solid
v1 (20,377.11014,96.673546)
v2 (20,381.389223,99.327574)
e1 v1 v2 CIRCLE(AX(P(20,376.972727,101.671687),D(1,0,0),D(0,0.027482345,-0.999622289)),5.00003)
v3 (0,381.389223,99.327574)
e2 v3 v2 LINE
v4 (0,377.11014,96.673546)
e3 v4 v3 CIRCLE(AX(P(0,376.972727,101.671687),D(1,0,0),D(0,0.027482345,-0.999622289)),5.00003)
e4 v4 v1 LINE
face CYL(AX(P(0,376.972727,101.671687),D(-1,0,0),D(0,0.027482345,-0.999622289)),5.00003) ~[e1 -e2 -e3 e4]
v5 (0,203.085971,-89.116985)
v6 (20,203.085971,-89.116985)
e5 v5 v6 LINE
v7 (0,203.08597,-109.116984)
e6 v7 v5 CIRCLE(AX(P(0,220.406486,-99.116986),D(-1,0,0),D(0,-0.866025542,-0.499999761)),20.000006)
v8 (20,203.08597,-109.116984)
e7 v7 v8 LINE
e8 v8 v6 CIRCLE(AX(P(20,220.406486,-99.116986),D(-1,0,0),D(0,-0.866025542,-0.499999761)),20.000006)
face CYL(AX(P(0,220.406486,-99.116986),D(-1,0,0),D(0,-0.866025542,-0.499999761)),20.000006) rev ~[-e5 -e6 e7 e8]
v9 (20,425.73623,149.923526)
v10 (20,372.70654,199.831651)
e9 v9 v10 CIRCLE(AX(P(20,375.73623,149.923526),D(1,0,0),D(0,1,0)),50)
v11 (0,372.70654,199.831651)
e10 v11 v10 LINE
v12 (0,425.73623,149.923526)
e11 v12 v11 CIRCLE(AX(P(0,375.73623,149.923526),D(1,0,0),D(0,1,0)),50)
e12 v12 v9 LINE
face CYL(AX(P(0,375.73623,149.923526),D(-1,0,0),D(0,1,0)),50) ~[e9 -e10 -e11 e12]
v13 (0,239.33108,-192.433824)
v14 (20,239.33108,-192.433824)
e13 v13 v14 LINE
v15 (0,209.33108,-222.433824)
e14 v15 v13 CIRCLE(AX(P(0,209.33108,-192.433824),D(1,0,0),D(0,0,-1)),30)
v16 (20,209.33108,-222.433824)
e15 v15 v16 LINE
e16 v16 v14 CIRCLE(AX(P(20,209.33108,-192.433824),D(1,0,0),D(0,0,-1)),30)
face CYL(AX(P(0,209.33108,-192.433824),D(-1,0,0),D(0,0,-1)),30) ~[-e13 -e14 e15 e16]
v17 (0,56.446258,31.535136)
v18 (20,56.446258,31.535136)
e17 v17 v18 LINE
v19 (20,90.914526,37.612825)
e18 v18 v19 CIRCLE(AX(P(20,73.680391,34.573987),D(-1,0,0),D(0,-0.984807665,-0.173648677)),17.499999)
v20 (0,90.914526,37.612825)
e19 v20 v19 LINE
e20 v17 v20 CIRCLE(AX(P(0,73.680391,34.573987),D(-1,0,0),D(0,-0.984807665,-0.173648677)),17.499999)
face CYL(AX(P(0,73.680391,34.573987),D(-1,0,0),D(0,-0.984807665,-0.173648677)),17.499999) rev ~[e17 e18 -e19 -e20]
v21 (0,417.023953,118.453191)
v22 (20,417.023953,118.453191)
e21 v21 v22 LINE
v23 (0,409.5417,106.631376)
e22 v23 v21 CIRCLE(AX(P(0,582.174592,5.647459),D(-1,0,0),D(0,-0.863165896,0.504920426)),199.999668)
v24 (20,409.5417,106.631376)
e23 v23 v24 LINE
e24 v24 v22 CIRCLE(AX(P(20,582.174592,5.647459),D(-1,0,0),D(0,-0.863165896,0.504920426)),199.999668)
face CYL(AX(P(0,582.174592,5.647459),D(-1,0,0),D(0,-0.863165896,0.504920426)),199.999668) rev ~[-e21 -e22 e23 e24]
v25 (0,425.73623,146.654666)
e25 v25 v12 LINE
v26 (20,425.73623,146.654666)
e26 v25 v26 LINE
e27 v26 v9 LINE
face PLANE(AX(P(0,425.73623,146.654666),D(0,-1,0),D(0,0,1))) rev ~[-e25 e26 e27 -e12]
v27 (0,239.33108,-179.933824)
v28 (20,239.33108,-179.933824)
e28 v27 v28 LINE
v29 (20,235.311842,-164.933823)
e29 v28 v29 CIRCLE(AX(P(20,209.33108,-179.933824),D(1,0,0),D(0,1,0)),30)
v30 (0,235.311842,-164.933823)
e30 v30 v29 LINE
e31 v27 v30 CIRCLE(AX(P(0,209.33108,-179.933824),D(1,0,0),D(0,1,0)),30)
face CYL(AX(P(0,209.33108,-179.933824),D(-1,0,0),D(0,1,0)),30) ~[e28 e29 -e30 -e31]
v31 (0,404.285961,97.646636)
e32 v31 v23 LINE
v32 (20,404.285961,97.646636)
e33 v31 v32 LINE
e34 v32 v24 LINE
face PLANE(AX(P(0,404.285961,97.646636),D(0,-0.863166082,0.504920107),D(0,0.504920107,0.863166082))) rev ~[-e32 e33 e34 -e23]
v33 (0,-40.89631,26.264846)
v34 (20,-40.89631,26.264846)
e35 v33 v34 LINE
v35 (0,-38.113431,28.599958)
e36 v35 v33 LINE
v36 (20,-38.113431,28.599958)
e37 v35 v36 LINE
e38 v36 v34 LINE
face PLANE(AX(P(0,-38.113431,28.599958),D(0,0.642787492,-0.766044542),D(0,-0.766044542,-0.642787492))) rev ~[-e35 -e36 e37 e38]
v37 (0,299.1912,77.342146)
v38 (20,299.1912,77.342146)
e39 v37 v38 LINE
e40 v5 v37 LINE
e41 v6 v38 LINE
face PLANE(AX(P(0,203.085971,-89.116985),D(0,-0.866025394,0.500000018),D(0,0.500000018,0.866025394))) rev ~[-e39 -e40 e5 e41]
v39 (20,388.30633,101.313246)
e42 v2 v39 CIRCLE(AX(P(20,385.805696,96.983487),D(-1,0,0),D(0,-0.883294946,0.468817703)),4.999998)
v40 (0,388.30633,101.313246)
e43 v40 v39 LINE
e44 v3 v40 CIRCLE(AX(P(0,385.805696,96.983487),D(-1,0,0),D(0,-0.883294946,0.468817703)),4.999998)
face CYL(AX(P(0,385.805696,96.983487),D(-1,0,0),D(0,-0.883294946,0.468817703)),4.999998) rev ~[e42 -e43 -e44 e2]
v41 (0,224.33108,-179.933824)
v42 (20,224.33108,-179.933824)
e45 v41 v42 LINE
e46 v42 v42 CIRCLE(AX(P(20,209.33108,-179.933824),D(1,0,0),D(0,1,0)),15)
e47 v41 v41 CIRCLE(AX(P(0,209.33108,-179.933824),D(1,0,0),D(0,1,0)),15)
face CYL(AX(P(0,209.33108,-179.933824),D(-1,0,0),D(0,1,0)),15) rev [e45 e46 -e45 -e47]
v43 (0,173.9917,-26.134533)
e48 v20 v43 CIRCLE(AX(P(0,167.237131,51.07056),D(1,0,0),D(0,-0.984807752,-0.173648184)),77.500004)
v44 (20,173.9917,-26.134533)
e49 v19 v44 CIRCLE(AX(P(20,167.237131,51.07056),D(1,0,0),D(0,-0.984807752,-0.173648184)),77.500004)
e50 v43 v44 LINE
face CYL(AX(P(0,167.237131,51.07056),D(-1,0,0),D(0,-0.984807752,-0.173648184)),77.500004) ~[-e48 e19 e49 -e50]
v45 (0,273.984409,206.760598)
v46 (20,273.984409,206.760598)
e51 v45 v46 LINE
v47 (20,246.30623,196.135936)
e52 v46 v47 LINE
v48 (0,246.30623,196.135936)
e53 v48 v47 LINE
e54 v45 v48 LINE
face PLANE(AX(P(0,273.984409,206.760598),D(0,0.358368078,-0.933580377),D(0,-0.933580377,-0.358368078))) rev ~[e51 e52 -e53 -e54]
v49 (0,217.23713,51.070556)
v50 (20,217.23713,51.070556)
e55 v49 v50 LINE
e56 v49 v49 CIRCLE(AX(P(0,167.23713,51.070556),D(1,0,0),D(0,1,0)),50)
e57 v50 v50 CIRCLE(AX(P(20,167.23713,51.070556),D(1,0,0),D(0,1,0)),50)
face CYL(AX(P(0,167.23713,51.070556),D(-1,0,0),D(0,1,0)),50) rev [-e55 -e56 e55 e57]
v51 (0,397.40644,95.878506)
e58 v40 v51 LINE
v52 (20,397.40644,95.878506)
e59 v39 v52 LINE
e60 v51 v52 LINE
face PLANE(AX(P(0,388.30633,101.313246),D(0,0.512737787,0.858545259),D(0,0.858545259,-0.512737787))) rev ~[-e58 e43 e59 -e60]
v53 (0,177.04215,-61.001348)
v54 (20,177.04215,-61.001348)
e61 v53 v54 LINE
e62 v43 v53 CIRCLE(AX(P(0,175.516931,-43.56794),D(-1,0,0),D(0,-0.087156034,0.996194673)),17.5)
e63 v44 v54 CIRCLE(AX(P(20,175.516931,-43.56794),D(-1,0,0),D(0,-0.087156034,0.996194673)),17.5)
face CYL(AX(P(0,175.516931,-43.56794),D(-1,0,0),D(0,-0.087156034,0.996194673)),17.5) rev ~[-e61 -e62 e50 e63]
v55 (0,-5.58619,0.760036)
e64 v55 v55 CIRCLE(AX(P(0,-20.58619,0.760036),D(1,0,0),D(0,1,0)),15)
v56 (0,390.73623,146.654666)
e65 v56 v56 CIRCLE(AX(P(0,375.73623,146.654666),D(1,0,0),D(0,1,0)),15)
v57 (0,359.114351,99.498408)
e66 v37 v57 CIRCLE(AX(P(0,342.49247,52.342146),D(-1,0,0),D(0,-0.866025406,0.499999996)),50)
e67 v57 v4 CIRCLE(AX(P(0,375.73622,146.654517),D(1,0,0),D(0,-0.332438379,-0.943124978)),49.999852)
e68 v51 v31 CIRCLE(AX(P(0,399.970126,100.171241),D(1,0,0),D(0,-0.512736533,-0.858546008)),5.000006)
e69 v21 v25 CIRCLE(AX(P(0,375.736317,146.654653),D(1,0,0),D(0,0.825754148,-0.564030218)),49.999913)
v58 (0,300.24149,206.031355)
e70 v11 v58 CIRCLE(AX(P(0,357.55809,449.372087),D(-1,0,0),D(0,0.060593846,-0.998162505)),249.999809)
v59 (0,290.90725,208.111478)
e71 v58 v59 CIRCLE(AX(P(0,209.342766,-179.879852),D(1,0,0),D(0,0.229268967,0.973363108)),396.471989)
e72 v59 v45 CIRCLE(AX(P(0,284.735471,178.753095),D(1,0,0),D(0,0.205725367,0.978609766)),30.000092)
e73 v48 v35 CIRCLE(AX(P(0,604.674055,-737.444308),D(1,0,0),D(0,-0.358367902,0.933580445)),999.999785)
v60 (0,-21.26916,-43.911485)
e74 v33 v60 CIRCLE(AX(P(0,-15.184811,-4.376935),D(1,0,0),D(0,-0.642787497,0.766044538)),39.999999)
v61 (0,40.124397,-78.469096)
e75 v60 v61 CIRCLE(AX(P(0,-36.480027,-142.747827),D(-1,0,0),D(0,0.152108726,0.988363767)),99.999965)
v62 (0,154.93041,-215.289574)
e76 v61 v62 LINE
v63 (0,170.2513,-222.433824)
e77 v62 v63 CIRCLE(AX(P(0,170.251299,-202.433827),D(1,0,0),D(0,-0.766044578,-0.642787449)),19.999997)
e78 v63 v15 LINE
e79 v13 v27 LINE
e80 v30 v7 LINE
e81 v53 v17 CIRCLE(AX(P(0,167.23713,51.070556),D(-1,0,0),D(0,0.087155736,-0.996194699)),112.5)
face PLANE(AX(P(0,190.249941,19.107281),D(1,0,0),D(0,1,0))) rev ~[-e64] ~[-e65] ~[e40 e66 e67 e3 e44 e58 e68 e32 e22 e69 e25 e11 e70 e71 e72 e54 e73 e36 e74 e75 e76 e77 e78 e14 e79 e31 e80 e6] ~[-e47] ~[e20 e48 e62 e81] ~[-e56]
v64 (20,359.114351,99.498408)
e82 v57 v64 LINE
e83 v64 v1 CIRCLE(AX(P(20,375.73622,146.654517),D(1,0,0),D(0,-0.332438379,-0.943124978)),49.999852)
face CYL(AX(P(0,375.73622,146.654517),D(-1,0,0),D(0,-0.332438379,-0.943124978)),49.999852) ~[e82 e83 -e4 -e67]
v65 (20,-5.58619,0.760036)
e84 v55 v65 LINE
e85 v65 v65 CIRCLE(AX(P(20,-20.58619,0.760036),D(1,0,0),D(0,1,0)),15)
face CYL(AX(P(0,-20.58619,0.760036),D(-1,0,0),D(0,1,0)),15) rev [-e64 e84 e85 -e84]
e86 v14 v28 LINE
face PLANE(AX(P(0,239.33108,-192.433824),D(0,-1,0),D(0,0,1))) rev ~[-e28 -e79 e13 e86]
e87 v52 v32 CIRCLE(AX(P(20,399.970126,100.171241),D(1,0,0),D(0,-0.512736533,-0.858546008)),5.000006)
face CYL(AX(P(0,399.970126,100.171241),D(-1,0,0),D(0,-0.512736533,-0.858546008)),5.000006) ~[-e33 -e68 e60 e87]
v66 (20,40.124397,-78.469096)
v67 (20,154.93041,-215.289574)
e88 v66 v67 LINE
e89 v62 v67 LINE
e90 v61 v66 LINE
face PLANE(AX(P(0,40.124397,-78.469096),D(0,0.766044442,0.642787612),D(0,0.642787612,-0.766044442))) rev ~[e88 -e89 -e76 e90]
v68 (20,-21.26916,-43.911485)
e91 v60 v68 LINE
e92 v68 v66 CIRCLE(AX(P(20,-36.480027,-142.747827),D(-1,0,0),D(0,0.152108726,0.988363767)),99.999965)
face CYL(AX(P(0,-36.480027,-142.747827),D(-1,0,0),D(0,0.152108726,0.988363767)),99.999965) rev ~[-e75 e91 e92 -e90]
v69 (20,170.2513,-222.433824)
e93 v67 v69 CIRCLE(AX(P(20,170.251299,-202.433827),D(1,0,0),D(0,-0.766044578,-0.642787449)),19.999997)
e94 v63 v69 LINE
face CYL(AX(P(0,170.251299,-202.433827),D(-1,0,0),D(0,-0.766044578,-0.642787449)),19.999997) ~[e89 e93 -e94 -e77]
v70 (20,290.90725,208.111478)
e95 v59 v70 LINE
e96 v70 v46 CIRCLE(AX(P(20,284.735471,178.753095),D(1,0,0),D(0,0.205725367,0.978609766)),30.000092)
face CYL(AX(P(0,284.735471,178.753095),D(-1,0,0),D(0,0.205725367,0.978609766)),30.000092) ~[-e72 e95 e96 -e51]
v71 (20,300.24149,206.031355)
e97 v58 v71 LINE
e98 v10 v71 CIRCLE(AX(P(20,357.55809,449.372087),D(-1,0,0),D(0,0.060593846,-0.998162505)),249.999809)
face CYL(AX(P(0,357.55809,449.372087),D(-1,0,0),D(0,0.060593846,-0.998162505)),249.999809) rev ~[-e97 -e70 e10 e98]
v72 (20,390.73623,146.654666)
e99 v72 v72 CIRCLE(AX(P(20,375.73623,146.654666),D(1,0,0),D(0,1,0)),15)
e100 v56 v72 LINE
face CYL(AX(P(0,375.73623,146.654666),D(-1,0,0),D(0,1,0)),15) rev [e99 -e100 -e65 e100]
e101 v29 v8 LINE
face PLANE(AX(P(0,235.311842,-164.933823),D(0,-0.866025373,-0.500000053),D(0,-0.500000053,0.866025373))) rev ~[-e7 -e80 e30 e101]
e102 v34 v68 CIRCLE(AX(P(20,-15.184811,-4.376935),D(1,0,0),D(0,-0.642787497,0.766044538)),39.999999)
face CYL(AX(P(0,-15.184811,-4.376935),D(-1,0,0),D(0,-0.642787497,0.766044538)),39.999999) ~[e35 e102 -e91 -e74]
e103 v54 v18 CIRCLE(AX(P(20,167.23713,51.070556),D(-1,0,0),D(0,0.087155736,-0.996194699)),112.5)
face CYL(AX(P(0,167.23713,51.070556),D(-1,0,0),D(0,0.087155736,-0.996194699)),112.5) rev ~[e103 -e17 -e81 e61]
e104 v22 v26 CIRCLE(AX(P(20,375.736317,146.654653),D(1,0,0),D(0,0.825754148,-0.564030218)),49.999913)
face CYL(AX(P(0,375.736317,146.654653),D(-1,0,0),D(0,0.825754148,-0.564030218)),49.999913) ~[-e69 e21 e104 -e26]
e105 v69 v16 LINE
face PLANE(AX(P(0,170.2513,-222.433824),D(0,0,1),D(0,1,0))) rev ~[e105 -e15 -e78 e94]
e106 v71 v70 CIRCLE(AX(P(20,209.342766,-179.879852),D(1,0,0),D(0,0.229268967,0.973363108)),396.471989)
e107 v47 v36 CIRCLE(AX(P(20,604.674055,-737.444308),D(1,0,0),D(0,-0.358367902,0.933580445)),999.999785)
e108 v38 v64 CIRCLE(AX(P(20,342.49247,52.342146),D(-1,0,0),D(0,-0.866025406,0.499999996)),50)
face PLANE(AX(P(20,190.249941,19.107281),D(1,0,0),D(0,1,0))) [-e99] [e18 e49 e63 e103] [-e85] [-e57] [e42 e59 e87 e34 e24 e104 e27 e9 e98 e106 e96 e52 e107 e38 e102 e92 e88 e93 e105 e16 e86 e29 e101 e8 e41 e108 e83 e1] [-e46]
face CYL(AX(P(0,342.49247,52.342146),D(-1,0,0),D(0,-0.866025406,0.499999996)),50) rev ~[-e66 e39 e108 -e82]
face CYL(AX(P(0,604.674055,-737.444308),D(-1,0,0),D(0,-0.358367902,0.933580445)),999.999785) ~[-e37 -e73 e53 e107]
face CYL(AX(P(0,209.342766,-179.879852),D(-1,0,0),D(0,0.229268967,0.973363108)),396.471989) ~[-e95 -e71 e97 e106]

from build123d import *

# Parameters (mm, degrees)
F0_R     = 1.5
F0_R_2   = 5
F1_DEPTH = 2
F2_SCALE = 10


# Not quite as in the source:
# - ends of sketch curves that miss each other by under 0.0002 mm in the source are joined


with BuildPart() as f1:
    # F0 (on Right) → F1 (new body)
    with BuildSketch(Plane.YZ):
        with BuildLine():
            Line((20.303062, 10.815357), (21.213073, 10.271883))
            ThreePointArc((21.213073, 10.271883), (21.5939035848, 10.2168943828), (21.901025054, 10.4486959684))
            Line((21.901025054, 10.4486959684), (22.426599, 11.34717))
            ThreePointArc((22.426599, 11.34717), (22.7903712384, 11.9448053837), (23.1748242578, 12.529351507))
            ThreePointArc((23.1748242578, 12.529351507), (23.8232826043, 13.8736711803), (24.046052, 15.349499))
            Line((24.046052, 15.349499), (24.046052, 15.676385))
            ThreePointArc((24.046052, 15.676385), (22.4727964344, 19.3174593718), (18.7430829675, 20.6671975356))
            ThreePointArc((18.7430829675, 20.6671975356), (15.0971647826, 20.7122553198), (11.4965779735, 21.2871678873))
            ThreePointArc((11.4965779735, 21.2871678873), (11.0304932137, 21.3939885254), (10.5631540495, 21.4951802352))
            ThreePointArc((10.5631540495, 21.4951802352), (9.7072570471, 21.5498382875), (8.8708699259, 21.360092193))
            Line((8.8708699259, 21.360092193), (6.103052, 20.297626))
            ThreePointArc((6.103052, 20.297626), (-8.8139895114, 13.1024999173), (-22.3389141406, 3.5440281676))
            Line((-22.3389141406, 3.5440281676), (-22.617202, 3.310517))
            ThreePointArc((-22.617202, 3.310517), (-23.8982246357, -0.8310495022), (-20.6544870079, -3.7071160511))
            ThreePointArc((-20.6544870079, -3.7071160511), (-17.2704039619, -4.8764379221), (-14.5151312861, -7.1628772401))
            Line((-14.5151312861, -7.1628772401), (-3.03453, -20.844925))
            ThreePointArc((-3.03453, -20.844925), (-2.3476776328, -21.3719655231), (-1.502441, -21.55935))
            Line((-1.502441, -21.55935), (2.405537, -21.55935))
            ThreePointArc((2.405537, -21.55935), (4.5268573436, -20.6806703436), (5.405537, -18.55935))
            Line((5.405537, -18.55935), (5.405537, -17.30935))
            ThreePointArc((5.405537, -17.30935), (5.3033144652, -16.5328928137), (5.0036131585, -15.8093499085))
            Line((5.0036131585, -15.8093499085), (1.781026, -10.227666))
            ThreePointArc((1.781026, -10.227666), (1.513077, -9.227666), (1.7810261443, -8.2276660833))
            Line((1.7810261443, -8.2276660833), (11.391549, 8.418247))
            ThreePointArc((11.391549, 8.418247), (13.9876851036, 10.6079458785), (17.3838640825, 10.633873234))
            ThreePointArc((17.3838640825, 10.633873234), (18.2706804185, 10.4099849641), (19.1834430004, 10.3513869851))
            ThreePointArc((19.1834430004, 10.3513869851), (19.4332447525, 10.4262916315), (19.6113513075, 10.6167898368))
            ThreePointArc((19.6113513075, 10.6167898368), (19.9150373869, 10.862970839), (20.303062, 10.815357))
        make_face()
        with Locations((2.405537, -17.30935)):
            Circle(F0_R, mode=Mode.SUBTRACT)
        with Locations((-20.58619, 0.760036)):
            Circle(F0_R, mode=Mode.SUBTRACT)
        with BuildLine():
            ThreePointArc((-0.8233559685, -5.41610236), (-8.6524240902, -3.1341370676), (-12.8829452145, 3.8375459622))
            ThreePointArc((-12.8829452145, 3.8375459622), (-11.4634165059, 5.8648445334), (-9.436118366, 4.4453149355))
            ThreePointArc((-9.436118366, 4.4453149355), (-6.5217592217, -0.3574002745), (-1.1284010077, -1.9294209114))
            ThreePointArc((-1.1284010077, -1.9294209114), (0.7674627243, -3.5202384804), (-0.8233559685, -5.41610236))
        make_face(mode=Mode.SUBTRACT)
        with Locations((-1.803858, 5.791088)):
            Circle(F0_R_2, mode=Mode.SUBTRACT)
        with Locations((19.046052, 15.349499)):
            Circle(F0_R, mode=Mode.SUBTRACT)
    extrude(amount=F1_DEPTH)


with BuildPart() as f1_1:
    # F2: moved
    add(f1.part.scale(F2_SCALE).moved(Location((0, 185.27571, -6.840324))))


solid = f1_1.part
